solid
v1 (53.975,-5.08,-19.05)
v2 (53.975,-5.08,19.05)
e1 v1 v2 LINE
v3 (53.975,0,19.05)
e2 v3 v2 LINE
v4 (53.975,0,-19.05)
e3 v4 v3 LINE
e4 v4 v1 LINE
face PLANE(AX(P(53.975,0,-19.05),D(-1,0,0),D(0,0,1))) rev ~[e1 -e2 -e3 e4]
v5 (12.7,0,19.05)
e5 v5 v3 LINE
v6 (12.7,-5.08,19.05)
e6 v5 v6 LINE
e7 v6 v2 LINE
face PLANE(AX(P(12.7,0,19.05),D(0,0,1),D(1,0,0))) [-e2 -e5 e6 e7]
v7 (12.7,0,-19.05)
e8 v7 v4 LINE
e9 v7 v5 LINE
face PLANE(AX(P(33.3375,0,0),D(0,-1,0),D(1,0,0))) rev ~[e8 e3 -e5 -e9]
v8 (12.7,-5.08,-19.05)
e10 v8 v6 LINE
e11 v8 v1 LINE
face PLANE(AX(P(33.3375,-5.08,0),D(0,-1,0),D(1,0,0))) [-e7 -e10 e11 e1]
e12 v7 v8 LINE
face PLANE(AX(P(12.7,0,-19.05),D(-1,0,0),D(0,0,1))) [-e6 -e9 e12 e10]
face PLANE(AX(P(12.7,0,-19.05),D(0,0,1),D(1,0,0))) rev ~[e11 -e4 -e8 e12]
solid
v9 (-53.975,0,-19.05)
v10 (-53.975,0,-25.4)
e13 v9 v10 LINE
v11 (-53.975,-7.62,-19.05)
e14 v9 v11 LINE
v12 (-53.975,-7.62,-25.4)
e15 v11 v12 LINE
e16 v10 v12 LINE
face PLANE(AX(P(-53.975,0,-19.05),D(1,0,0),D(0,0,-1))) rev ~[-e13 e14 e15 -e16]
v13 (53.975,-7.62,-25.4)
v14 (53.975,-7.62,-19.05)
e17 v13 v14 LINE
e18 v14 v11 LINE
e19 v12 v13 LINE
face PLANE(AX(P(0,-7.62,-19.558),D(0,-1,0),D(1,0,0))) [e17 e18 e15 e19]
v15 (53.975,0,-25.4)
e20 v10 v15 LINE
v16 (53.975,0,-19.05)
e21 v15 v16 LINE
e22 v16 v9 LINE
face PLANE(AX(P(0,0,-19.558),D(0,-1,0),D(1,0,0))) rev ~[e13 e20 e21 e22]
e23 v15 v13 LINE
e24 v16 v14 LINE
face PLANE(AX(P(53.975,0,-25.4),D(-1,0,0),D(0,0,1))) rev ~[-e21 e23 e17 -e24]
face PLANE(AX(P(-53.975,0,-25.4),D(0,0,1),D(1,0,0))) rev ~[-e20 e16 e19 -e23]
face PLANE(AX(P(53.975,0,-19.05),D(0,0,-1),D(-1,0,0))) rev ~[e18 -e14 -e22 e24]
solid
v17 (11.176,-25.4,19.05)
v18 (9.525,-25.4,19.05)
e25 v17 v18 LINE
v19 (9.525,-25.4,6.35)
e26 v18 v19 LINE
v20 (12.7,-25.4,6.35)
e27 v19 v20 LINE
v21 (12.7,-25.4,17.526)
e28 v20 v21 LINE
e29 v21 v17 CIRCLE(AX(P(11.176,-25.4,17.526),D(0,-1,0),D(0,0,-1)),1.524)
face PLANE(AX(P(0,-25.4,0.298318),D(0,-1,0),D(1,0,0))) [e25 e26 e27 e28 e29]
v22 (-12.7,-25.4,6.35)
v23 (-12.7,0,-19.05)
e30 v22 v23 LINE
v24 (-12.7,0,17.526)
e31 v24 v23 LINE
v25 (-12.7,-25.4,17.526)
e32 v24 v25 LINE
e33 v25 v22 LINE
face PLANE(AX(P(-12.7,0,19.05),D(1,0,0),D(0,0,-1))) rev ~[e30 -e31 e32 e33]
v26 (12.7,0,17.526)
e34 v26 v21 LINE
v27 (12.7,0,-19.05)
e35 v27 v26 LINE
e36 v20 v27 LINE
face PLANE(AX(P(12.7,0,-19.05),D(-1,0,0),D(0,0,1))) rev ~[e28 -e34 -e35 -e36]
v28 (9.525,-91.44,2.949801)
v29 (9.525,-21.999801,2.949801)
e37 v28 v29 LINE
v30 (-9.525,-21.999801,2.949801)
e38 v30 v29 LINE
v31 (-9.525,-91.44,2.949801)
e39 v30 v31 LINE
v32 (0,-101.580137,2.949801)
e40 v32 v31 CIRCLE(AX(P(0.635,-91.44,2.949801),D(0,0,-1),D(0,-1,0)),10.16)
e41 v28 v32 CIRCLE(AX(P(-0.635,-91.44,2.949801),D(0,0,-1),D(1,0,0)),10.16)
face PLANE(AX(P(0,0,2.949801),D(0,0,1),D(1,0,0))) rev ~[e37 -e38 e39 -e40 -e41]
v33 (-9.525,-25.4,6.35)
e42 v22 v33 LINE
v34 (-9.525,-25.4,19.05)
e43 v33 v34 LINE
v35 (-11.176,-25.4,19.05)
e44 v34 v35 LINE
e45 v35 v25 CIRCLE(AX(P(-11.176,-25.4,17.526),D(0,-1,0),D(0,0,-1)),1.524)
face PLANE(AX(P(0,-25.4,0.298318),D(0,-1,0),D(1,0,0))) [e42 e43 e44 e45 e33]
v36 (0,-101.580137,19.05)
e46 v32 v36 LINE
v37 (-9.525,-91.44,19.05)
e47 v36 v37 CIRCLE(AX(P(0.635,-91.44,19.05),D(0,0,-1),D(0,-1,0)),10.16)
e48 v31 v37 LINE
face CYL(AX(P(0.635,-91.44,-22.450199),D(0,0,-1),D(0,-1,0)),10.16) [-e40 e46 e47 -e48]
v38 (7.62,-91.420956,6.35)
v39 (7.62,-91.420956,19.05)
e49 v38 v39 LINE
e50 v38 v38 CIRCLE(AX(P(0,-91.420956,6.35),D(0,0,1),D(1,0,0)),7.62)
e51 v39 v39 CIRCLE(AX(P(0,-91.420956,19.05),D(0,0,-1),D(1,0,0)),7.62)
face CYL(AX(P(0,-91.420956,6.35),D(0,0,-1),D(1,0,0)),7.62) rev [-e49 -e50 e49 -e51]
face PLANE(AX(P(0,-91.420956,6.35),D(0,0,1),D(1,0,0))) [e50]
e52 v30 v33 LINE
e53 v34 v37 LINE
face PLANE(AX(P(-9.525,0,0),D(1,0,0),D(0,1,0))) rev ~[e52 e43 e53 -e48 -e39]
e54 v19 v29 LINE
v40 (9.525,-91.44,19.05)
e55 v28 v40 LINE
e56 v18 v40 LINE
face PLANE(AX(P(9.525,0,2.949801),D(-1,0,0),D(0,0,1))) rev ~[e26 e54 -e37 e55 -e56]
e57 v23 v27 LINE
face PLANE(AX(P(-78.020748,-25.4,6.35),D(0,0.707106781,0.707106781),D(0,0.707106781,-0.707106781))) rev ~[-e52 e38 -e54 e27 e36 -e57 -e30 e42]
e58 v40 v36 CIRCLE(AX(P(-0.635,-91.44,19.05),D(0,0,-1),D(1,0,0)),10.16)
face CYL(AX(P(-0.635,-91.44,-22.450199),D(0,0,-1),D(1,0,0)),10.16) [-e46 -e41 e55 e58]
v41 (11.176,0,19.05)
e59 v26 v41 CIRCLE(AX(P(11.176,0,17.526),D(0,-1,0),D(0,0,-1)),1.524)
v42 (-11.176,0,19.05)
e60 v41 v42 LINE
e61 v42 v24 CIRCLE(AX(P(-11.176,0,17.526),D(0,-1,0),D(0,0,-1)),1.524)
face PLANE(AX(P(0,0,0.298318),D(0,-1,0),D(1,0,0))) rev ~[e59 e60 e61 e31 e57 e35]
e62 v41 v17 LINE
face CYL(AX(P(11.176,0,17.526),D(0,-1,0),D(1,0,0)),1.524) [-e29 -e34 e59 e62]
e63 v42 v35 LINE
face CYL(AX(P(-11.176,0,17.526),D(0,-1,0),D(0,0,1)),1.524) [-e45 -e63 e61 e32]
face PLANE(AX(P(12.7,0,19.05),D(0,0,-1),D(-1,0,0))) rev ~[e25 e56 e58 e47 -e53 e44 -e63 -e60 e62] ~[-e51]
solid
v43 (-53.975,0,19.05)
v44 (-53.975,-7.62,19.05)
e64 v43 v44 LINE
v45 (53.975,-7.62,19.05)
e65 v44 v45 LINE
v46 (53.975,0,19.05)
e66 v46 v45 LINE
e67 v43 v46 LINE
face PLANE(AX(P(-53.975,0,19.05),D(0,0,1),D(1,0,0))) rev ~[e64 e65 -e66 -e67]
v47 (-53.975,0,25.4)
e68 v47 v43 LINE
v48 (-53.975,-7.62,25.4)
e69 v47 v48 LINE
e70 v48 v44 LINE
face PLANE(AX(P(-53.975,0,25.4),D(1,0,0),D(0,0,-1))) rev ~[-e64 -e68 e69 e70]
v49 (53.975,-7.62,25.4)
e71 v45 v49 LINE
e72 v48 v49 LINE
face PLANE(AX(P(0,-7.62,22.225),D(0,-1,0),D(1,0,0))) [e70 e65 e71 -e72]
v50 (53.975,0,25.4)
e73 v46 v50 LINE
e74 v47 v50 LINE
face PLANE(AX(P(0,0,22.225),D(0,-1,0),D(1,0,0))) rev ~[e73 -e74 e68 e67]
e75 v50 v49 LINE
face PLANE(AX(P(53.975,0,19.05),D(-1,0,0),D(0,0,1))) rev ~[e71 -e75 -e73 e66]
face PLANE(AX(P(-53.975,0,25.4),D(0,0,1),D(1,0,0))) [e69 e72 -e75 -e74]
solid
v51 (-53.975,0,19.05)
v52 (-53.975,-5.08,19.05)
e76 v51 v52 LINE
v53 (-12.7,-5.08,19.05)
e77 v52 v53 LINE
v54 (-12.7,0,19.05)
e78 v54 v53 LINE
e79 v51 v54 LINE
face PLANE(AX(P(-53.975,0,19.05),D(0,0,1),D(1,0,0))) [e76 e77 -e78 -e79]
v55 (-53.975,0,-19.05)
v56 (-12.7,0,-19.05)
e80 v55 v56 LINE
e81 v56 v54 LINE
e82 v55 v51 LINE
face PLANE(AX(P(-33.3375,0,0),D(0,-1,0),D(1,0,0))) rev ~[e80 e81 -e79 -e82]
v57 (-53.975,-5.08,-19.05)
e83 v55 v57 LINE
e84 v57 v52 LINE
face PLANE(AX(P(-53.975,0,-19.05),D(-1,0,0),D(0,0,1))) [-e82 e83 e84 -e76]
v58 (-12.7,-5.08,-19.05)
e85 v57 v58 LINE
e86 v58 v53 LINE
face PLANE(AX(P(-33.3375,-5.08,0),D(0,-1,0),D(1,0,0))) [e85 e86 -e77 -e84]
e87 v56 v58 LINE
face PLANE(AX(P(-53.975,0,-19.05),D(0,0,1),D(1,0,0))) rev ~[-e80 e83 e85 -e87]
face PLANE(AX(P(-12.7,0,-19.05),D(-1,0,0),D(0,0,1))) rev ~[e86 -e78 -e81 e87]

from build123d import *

# Parameters (mm, degrees)
F0_W         = 15.24
F0_H         = 12.7
F0_H_2       = 0.8601994222
F1_DEPTH     = 101.6
F2_DEPTH     = 25.4
F4_START     = 6.35
F3_R         = 7.62
F4_DEPTH     = 18.796
F5_T1_DEPTH  = 66.9001994222
F0_W_2       = 41.275
F0_H_3       = 38.1
F6_DEPTH     = 5.08
F0_W_3       = 107.95
F0_H_4       = 1.016
F0_H_5       = 4.318
F7_DEPTH     = 7.62
F8_R         = 1.524
F9_T4_DEPTH  = 156.0414957887
F9_T10_DEPTH = 156.0414957887
F9_T16_DEPTH = 156.0414957887
F9_T23_DEPTH = 156.0414957887
F9_T29_DEPTH = 156.0414957887


# Not quite as in the source:
# - a fillet or chamfer that OpenCascade refuses, or shapes differently, is made with other operations: its cross-section is extruded or revolved along the edge and cut away or added


with BuildPart() as f1:
    # F0 (on Front) → F1 (new body)
    with BuildSketch(Plane.XZ):
        Polygon((9.525, 2.9498005778), (9.525, 19.05), (7.62, 19.05), (7.62, 18.1898005778), (7.62, 5.4898005778), (-7.62, 5.4898005778), (-7.62, 18.1898005778), (-7.62, 19.05), (-9.525, 19.05), (-9.525, 2.9498005778), align=None)
        with Locations((0, 11.8398005778)):
            Rectangle(F0_W, F0_H)
        with Locations((0, 18.6199002889)):
            Rectangle(F0_W, F0_H_2)
    extrude(amount=F1_DEPTH)

    # F0 (on Front) → F2 (join)
    with BuildSketch(Plane.XZ):
        Polygon((12.7, -19.05), (12.7, 19.05), (9.525, 19.05), (9.525, 2.9498005778), (-9.525, 2.9498005778), (-9.525, 19.05), (-12.7, 19.05), (-12.7, -19.05), align=None)
    extrude(amount=F2_DEPTH)

    # F3 (on Top) → F4 (cut)
    with BuildSketch(Plane.XY.offset(F4_START)):
        with Locations((0, -91.4209560153)):
            Circle(F3_R)
    extrude(amount=F4_DEPTH, mode=Mode.SUBTRACT)

    # F5: fillet of radius 10.16 on 2 edges, made by hand

    # F5_s2 → F5_t1 (cut)
    with BuildSketch(Plane.XY.offset(-22.4501994222)):
        with BuildLine():
            ThreePointArc((9.525, -91.44), (6.5492048969, -98.6242048969), (-0.635, -101.6))
            Line((-0.635, -101.6), (9.525, -101.6))
            Line((9.525, -101.6), (9.525, -91.44))
        make_face()
        with BuildLine():
            ThreePointArc((0.635, -101.6), (-6.5492048969, -98.6242048969), (-9.525, -91.44))
            Line((-9.525, -91.44), (-9.525, -101.6))
            Line((-9.525, -101.6), (0.635, -101.6))
        make_face()
    extrude(amount=F5_T1_DEPTH, mode=Mode.SUBTRACT)

    # F8
    f8_edges = [f1.edges().sort_by_distance(p)[0] for p in [
        (-12.7, -12.7, 19.05),
        (12.7, -12.7, 19.05),
    ]]
    fillet(f8_edges, radius=F8_R)

    # F9: chamfer of 25.4 on 1 edges, made by hand


with BuildPart() as f6:
    # F0 (on Front) → F6 (new body)
    with BuildSketch(Plane.XZ):
        with Locations((-33.3375, 0)):
            Rectangle(F0_W_2, F0_H_3)
    extrude(amount=F6_DEPTH)


with BuildPart() as f6b:
    # F0 (on Front) → F6, piece 2 (new body)
    with BuildSketch(Plane.XZ):
        with Locations((33.3375, 0)):
            Rectangle(F0_W_2, F0_H_3)
    extrude(amount=F6_DEPTH)


with BuildPart() as f7:
    # F0 (on Front) → F7 (new body)
    with BuildSketch(Plane.XZ):
        Polygon((53.975, -20.066), (53.975, -19.05), (12.7, -19.05), (-12.7, -19.05), (-53.975, -19.05), (-53.975, -20.066), align=None)
        with Locations((0, -24.892)):
            Rectangle(F0_W_3, F0_H_4)
        with Locations((0, -22.225)):
            Rectangle(F0_W_3, F0_H_5)
    extrude(amount=F7_DEPTH)


with BuildPart() as f7b:
    # F0 (on Front) → F7, piece 2 (new body)
    with BuildSketch(Plane.XZ):
        with Locations((0, 22.225)):
            Rectangle(F0_W_3, F0_H_5)
        with Locations((0, 24.892)):
            Rectangle(F0_W_3, F0_H_4)
        Polygon((53.975, 19.05), (53.975, 20.066), (-53.975, 20.066), (-53.975, 19.05), (-12.7, 19.05), (-9.525, 19.05), (-7.62, 19.05), (7.62, 19.05), (9.525, 19.05), (12.7, 19.05), align=None)
    extrude(amount=F7_DEPTH)


with BuildPart() as f9_tool2:
    # F9_s3 → F9_t4 (new body)
    with BuildSketch(Plane.YZ.offset(-78.0207478943)):
        Polygon((-25.4, 6.35), (0, -19.05), (-25.4, -19.05), align=None)
    extrude(amount=F9_T4_DEPTH)

    split(bisect_by=Plane.XY.offset(2.9498005778), keep=Keep.TOP)

    split(bisect_by=Plane.YZ.offset(-9.525), keep=Keep.BOTTOM)


with BuildPart() as f1_1:
    add(f1.part)

    # F9_t1: cut F9_tool2
    add(f9_tool2.part, mode=Mode.SUBTRACT)


with BuildPart() as f9_tool8:
    # F9_s9 → F9_t10 (new body)
    with BuildSketch(Plane.YZ.offset(-78.0207478943)):
        Polygon((-25.4, 6.35), (0, -19.05), (-25.4, -19.05), align=None)
    extrude(amount=F9_T10_DEPTH)

    split(bisect_by=Plane.XY.offset(2.9498005778), keep=Keep.BOTTOM)

    split(bisect_by=Plane.YZ.offset(-9.525), keep=Keep.BOTTOM)


with BuildPart() as f1_2:
    add(f1_1.part)

    # F9_t7: cut F9_tool8
    add(f9_tool8.part, mode=Mode.SUBTRACT)


with BuildPart() as f9_tool14:
    # F9_s15 → F9_t16 (new body)
    with BuildSketch(Plane.YZ.offset(-78.0207478943)):
        Polygon((-25.4, 6.35), (0, -19.05), (-25.4, -19.05), align=None)
    extrude(amount=F9_T16_DEPTH)

    split(bisect_by=Plane.YZ.offset(9.525), keep=Keep.BOTTOM)

    split(bisect_by=Plane.XY.offset(2.9498005778), keep=Keep.BOTTOM)

    split(bisect_by=Plane.YZ.offset(-9.525), keep=Keep.TOP)


with BuildPart() as f1_3:
    add(f1_2.part)

    # F9_t13: cut F9_tool14
    add(f9_tool14.part, mode=Mode.SUBTRACT)


with BuildPart() as f9_tool21:
    # F9_s22 → F9_t23 (new body)
    with BuildSketch(Plane.YZ.offset(-78.0207478943)):
        Polygon((-25.4, 6.35), (0, -19.05), (-25.4, -19.05), align=None)
    extrude(amount=F9_T23_DEPTH)

    split(bisect_by=Plane.YZ.offset(9.525), keep=Keep.TOP)

    split(bisect_by=Plane.XY.offset(2.9498005778), keep=Keep.TOP)


with BuildPart() as f1_4:
    add(f1_3.part)

    # F9_t20: cut F9_tool21
    add(f9_tool21.part, mode=Mode.SUBTRACT)


with BuildPart() as f9_tool27:
    # F9_s28 → F9_t29 (new body)
    with BuildSketch(Plane.YZ.offset(-78.0207478943)):
        Polygon((-25.4, 6.35), (0, -19.05), (-25.4, -19.05), align=None)
    extrude(amount=F9_T29_DEPTH)

    split(bisect_by=Plane.YZ.offset(9.525), keep=Keep.TOP)

    split(bisect_by=Plane.XY.offset(2.9498005778), keep=Keep.BOTTOM)


with BuildPart() as f1_5:
    add(f1_4.part)

    # F9_t26: cut F9_tool27
    add(f9_tool27.part, mode=Mode.SUBTRACT)


solid = Compound([f6.part, f6b.part, f7.part, f7b.part, f1_5.part])
